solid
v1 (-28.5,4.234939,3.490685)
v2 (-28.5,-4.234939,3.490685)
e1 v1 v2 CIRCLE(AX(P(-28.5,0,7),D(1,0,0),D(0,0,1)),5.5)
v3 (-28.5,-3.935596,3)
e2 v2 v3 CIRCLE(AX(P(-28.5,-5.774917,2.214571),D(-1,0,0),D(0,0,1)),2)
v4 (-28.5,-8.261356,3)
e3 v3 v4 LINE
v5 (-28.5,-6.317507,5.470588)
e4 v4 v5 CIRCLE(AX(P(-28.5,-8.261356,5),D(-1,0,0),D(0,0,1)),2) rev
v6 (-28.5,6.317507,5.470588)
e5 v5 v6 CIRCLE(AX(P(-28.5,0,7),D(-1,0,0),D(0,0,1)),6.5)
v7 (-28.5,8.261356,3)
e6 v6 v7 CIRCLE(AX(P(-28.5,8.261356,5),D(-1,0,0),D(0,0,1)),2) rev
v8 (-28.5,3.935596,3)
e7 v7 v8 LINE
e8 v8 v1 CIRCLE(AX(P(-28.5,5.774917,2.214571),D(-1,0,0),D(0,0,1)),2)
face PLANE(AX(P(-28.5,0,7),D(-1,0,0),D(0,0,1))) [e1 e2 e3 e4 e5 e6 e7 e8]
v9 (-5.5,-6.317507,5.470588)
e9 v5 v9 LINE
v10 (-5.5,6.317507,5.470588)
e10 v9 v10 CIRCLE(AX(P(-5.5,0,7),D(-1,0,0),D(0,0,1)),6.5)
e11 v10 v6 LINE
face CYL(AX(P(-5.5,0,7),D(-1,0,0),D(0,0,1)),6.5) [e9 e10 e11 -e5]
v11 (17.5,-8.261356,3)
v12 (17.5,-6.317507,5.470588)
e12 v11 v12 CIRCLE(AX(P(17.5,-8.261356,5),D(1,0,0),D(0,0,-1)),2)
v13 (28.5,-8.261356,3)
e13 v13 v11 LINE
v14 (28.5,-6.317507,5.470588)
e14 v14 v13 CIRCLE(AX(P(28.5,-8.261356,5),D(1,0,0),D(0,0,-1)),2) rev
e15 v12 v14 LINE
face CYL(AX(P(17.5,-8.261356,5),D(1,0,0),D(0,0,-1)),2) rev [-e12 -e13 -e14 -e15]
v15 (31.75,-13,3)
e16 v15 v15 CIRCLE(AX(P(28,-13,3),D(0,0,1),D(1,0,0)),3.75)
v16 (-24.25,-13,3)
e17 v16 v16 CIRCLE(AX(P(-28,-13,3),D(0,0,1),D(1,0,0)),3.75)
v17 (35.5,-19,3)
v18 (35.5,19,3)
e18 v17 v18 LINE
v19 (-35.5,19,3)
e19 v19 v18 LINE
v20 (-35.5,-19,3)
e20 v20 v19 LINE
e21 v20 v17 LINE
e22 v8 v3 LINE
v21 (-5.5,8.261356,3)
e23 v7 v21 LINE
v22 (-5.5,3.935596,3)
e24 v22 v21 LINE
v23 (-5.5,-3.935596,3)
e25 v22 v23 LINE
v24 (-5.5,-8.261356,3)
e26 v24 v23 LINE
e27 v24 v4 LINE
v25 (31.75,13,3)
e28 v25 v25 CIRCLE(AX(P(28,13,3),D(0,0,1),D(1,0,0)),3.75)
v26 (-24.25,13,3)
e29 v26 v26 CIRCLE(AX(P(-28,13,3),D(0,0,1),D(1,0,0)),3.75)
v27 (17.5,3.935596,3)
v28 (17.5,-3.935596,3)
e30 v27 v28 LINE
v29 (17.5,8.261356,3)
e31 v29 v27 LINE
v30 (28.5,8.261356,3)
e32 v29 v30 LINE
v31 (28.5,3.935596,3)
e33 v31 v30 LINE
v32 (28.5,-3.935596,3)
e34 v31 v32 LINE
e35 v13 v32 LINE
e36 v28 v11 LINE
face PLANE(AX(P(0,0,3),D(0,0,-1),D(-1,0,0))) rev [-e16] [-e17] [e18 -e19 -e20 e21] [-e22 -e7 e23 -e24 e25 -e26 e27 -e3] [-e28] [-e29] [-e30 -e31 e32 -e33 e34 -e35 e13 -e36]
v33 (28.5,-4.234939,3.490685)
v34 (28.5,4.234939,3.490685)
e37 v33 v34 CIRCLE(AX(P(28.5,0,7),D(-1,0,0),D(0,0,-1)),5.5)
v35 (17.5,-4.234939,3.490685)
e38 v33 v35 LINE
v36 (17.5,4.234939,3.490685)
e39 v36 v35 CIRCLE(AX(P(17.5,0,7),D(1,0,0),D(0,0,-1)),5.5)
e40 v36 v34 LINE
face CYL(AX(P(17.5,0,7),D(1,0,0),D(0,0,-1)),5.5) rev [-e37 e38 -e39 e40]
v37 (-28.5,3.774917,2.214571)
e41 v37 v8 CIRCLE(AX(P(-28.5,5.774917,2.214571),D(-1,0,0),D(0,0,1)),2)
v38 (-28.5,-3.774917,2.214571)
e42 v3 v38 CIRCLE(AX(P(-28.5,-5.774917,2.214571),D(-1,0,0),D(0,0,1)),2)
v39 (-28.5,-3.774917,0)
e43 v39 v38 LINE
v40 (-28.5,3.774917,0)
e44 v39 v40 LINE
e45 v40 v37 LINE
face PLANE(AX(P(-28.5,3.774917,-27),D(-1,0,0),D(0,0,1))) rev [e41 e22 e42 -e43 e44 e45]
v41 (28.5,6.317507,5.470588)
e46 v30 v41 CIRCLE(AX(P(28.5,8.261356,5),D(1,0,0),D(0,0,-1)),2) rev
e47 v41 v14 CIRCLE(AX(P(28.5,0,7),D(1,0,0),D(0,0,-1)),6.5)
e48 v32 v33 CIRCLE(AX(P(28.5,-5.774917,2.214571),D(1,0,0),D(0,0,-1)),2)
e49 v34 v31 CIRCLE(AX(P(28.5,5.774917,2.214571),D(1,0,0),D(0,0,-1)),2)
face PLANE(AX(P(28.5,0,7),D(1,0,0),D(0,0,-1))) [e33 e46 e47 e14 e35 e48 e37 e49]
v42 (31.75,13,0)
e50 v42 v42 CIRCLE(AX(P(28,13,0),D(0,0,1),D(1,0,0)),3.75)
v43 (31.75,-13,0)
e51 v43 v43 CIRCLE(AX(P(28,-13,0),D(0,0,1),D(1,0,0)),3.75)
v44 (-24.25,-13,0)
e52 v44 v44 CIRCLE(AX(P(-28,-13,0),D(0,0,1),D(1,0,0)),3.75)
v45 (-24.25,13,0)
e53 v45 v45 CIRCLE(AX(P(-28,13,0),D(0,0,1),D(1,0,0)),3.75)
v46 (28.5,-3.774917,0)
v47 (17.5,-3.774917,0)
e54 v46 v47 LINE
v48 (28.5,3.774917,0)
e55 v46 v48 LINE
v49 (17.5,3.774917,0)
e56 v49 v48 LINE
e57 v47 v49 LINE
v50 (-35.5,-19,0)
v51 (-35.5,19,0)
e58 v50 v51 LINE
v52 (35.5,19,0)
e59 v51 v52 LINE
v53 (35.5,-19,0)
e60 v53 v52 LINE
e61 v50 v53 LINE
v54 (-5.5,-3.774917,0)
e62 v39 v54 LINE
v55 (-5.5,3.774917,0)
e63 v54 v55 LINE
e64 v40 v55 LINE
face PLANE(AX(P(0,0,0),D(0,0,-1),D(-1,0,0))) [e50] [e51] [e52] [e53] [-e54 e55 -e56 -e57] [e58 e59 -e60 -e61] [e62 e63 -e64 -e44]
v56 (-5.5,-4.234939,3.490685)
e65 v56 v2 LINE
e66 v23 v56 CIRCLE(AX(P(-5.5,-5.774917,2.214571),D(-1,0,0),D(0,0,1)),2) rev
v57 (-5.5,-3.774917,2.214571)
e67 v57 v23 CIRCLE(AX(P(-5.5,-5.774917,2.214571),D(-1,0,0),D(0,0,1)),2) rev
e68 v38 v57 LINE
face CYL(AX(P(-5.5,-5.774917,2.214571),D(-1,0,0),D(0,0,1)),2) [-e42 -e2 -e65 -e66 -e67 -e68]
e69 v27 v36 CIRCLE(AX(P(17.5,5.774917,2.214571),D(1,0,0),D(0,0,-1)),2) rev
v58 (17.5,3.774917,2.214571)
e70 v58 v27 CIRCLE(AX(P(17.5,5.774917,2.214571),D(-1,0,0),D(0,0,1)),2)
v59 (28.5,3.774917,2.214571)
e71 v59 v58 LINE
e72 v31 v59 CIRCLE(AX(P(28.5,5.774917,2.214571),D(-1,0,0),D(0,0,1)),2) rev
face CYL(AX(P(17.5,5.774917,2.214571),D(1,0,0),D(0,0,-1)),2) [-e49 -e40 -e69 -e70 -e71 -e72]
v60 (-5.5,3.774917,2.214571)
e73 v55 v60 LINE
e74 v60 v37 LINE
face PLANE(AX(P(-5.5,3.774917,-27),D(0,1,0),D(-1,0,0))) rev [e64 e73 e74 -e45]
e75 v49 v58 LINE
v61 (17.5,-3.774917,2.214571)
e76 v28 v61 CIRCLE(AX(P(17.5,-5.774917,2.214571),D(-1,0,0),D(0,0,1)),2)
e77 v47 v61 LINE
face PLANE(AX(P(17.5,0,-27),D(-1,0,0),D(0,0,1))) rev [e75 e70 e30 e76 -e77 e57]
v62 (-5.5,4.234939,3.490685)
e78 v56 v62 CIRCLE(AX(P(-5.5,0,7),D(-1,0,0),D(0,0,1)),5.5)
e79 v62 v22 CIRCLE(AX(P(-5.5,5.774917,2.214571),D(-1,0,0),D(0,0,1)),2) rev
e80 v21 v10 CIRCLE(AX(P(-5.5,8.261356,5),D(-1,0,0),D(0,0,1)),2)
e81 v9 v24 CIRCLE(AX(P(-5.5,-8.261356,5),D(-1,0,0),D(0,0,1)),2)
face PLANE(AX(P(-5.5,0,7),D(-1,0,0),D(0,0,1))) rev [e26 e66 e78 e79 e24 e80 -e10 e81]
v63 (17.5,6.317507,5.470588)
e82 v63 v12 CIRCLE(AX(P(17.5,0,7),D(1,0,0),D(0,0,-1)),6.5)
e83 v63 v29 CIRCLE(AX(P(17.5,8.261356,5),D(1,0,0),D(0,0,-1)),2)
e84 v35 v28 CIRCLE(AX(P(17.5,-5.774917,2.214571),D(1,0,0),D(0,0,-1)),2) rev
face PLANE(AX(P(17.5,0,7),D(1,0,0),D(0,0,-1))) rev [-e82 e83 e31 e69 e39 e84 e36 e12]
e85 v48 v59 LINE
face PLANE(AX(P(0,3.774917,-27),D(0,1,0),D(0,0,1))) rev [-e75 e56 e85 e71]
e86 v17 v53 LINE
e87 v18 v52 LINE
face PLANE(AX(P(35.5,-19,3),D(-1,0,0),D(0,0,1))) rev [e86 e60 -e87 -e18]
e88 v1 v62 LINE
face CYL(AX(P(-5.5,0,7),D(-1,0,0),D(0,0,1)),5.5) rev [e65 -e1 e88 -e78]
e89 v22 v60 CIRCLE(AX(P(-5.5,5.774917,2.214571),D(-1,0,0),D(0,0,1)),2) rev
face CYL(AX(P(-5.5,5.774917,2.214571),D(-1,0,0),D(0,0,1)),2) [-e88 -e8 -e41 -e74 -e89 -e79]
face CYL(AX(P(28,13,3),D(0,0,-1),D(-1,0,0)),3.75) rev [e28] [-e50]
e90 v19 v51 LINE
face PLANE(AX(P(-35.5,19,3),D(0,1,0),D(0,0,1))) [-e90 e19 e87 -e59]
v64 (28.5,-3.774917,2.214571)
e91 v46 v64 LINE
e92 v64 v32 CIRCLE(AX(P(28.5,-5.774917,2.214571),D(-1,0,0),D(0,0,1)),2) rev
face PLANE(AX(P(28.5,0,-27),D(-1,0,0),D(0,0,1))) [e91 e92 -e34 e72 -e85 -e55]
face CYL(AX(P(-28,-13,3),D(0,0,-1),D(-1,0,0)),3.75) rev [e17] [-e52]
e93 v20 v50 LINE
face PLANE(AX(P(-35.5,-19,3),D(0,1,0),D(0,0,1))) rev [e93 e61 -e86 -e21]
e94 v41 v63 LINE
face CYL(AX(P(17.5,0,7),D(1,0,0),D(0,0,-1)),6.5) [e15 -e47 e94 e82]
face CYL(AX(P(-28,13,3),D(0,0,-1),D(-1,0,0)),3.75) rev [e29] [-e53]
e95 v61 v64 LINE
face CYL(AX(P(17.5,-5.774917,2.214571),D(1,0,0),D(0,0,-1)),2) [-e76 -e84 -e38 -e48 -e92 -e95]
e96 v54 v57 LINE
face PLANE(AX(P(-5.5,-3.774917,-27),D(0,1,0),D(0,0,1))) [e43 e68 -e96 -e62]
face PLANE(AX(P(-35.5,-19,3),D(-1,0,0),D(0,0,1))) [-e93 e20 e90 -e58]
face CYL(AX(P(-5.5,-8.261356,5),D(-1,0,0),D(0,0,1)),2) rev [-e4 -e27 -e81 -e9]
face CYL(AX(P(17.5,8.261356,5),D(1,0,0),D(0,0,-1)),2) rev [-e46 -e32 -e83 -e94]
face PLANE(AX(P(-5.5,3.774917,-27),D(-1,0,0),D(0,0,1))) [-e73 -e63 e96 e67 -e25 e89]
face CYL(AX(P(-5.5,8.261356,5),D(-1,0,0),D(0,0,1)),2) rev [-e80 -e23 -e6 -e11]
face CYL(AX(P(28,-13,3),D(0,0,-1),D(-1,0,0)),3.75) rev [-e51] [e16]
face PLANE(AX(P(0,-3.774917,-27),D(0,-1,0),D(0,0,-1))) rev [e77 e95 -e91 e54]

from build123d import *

# Parameters (mm, degrees)
SKETCH1_W           = 71
SKETCH1_H           = 38
SKETCH1_R           = 3.7499999999999996
SKETCH1_R_2         = 3.750000000000006
BOSS_EXTRUDE1_DEPTH = 3
SKETCH3_R           = 6.500000000000002
SKETCH3_R_2         = 5.5
BOSS_EXTRUDE2_DEPTH = 18
BOSS_EXTRUDE3_START = -30
SKETCH4_R           = 6.500000000000001
SKETCH4_R_2         = 5.499999999999999
BOSS_EXTRUDE3_DEPTH = 30
SKETCH5_W           = 11
SKETCH5_H           = 7.54983443527075
CUT_EXTRUDE2_DEPTH  = 30
CUT_EXTRUDE3_START  = -7
CUT_EXTRUDE3_DEPTH  = 7
CUT_EXTRUDE4_DEPTH  = 7
FILLET2_R           = 2
FILLET3_R           = 2


with BuildPart() as part:
    # Sketch1 → Boss-Extrude1 (new body)
    with BuildSketch(Plane.XY):
        Rectangle(SKETCH1_W, SKETCH1_H)
        with Locations((-27.999999999999996, 13.000000000000004)):
            Circle(SKETCH1_R, mode=Mode.SUBTRACT)
        with Locations((27.999999999999996, 13)):
            Circle(SKETCH1_R, mode=Mode.SUBTRACT)
        with Locations((-27.999999999999996, -12.999999999999996)):
            Circle(SKETCH1_R, mode=Mode.SUBTRACT)
        with Locations((27.999999999999996, -12.999999999999996)):
            Circle(SKETCH1_R_2, mode=Mode.SUBTRACT)
    extrude(amount=BOSS_EXTRUDE1_DEPTH)

    # Sketch3 → Boss-Extrude2 (add)
    with BuildSketch(Plane(origin=(35.5, 0, 0), x_dir=(0, 0, -1), z_dir=(1, 0, 0))):
        with Locations((-7, 3.47e-15)):
            Circle(SKETCH3_R)
        with Locations((-7, 3.47e-15)):
            Circle(SKETCH3_R_2, mode=Mode.SUBTRACT)
    extrude(amount=-BOSS_EXTRUDE2_DEPTH)

    # Sketch4 → Boss-Extrude3 (add)
    with BuildSketch(Plane.ZY.offset(35.5).offset(BOSS_EXTRUDE3_START)):
        with Locations((7, 3.47e-15)):
            Circle(SKETCH4_R)
        with Locations((7, 3.47e-15)):
            Circle(SKETCH4_R_2, mode=Mode.SUBTRACT)
    extrude(amount=BOSS_EXTRUDE3_DEPTH)

    # Sketch5 → Cut-Extrude2 (cut)
    with BuildSketch(Plane.XY.offset(3)):
        Polygon((-5.499999999999998, 3.7749172176353767), (-28.499999999999996, 3.7749172176353745), (-28.499999999999996, -3.77491721763537), (-5.499999999999998, -3.77491721763537), align=None)
        with Locations((22.999999999999996, 3.33e-15)):
            Rectangle(SKETCH5_W, SKETCH5_H)
    extrude(amount=-CUT_EXTRUDE2_DEPTH, mode=Mode.SUBTRACT)

    # Sketch6 → Cut-Extrude3 (cut)
    with BuildSketch(Plane.ZY.offset(35.5).offset(CUT_EXTRUDE3_START)):
        with BuildLine():
            Line((3, 3.7749172176353767), (3, 5.123475382979803))
            ThreePointArc((3, 5.123475382979803), (13.5, 6.36e-15), (3, -5.123475382979797))
            Line((3, -5.123475382979797), (3, -3.77491721763537))
            ThreePointArc((3, -3.77491721763537), (12.5, 3.47e-15), (3, 3.7749172176353767))
        make_face()
    extrude(amount=CUT_EXTRUDE3_DEPTH, mode=Mode.SUBTRACT)

    # Sketch7 → Cut-Extrude4 (cut)
    with BuildSketch(Plane(origin=(35.5, 0, 0), x_dir=(0, 0, -1), z_dir=(1, 0, 0))):
        with BuildLine():
            Line((-3, 5.123475382979803), (-3, 3.774917217635378))
            ThreePointArc((-3, 3.774917217635378), (-12.5, 4.14e-15), (-3, -3.774917217635371))
            Line((-3, -3.774917217635371), (-3, -5.123475382979797))
            ThreePointArc((-3, -5.123475382979797), (-13.5, 4.27e-15), (-3, 5.123475382979803))
        make_face()
    extrude(amount=-CUT_EXTRUDE4_DEPTH, mode=Mode.SUBTRACT)

    # Fillet2
    fillet2_edges = [part.edges().sort_by_distance(p)[0] for p in [
        (-17, 5.123475382979804, 3),
        (23, -5.123475382979798, 3),
        (23, 5.123475382979805, 3),
        (-17, -5.123475382979797, 3),
    ]]
    fillet(fillet2_edges, radius=FILLET2_R)

    # Fillet3
    # the kernel refuses this fillet: 2 mm, written as the material it takes off along each edge
    with BuildSketch(Plane(origin=(17.5, 3.7749172176353785, 3), x_dir=(0, 0, -1), z_dir=(1, 0, 0))) as fillet3_piece_1:
        with BuildLine():
            CenterArc((0.7854290434049434, 2), FILLET3_R, 230.35289769223547, 39.6471023077645)
            ThreePointArc((-0.49068536816965125, 0.460022075297303), (-0.2383040211369254, 0.23751887065380473), (0, 0))
            Line((0, 0), (0.7854290434049434, 0))
        make_face()
    extrude(amount=10.999999999999996, mode=Mode.SUBTRACT)
    with BuildSketch(Plane(origin=(-28.499999999999996, -3.77491721763537, 3), x_dir=(0, 5.7e-16, -1), z_dir=(1, 0, 0))) as fillet3_piece_2:
        with BuildLine():
            CenterArc((0.7854290434049418, -2), FILLET3_R, 89.99999999999997, 39.64710230776453)
            ThreePointArc((-0.49068536816965286, -0.46002207529730227), (-0.23830402113692464, -0.23751887065380414), (0, 0))
            Line((0, 0), (0.7854290434049429, 0))
        make_face()
    extrude(amount=22.999999999999996, mode=Mode.SUBTRACT)
    with BuildSketch(Plane(origin=(17.5, -3.7749172176353714, 3), x_dir=(0, -0.6839447234296507, 0.7295338342343956), z_dir=(1, 0, 0))) as fillet3_piece_3:
        with BuildLine():
            CenterArc((0.7948923853050224, 1.9962577183336636), FILLET3_R, 226.84732795972278, 39.647102307770695)
            Line((-0.572997061554437, 0.5371900498650203), (0, 0))
            ThreePointArc((0, 0), (0.33630062455212534, 0.01029127458242615), (0.6726012491042509, 1e-17))
        make_face()
    extrude(amount=10.999999999999996, mode=Mode.SUBTRACT)
    with BuildSketch(Plane(origin=(-28.499999999999996, 3.774917217635377, 3), x_dir=(0, 0.6839447234296516, 0.7295338342343948), z_dir=(1, 0, 0))) as fillet3_piece_4:
        with BuildLine():
            CenterArc((0.7948923853050189, -1.9962577183336638), FILLET3_R, 93.50556973250654, 39.647102307770794)
            Line((-0.5729970615544441, -0.5371900498650239), (0, 0))
            ThreePointArc((0, 0), (0.3363006245521229, -0.01029127458242505), (0.6726012491042468, -6e-17))
        make_face()
    extrude(amount=22.999999999999996, mode=Mode.SUBTRACT)


solid = part.part
